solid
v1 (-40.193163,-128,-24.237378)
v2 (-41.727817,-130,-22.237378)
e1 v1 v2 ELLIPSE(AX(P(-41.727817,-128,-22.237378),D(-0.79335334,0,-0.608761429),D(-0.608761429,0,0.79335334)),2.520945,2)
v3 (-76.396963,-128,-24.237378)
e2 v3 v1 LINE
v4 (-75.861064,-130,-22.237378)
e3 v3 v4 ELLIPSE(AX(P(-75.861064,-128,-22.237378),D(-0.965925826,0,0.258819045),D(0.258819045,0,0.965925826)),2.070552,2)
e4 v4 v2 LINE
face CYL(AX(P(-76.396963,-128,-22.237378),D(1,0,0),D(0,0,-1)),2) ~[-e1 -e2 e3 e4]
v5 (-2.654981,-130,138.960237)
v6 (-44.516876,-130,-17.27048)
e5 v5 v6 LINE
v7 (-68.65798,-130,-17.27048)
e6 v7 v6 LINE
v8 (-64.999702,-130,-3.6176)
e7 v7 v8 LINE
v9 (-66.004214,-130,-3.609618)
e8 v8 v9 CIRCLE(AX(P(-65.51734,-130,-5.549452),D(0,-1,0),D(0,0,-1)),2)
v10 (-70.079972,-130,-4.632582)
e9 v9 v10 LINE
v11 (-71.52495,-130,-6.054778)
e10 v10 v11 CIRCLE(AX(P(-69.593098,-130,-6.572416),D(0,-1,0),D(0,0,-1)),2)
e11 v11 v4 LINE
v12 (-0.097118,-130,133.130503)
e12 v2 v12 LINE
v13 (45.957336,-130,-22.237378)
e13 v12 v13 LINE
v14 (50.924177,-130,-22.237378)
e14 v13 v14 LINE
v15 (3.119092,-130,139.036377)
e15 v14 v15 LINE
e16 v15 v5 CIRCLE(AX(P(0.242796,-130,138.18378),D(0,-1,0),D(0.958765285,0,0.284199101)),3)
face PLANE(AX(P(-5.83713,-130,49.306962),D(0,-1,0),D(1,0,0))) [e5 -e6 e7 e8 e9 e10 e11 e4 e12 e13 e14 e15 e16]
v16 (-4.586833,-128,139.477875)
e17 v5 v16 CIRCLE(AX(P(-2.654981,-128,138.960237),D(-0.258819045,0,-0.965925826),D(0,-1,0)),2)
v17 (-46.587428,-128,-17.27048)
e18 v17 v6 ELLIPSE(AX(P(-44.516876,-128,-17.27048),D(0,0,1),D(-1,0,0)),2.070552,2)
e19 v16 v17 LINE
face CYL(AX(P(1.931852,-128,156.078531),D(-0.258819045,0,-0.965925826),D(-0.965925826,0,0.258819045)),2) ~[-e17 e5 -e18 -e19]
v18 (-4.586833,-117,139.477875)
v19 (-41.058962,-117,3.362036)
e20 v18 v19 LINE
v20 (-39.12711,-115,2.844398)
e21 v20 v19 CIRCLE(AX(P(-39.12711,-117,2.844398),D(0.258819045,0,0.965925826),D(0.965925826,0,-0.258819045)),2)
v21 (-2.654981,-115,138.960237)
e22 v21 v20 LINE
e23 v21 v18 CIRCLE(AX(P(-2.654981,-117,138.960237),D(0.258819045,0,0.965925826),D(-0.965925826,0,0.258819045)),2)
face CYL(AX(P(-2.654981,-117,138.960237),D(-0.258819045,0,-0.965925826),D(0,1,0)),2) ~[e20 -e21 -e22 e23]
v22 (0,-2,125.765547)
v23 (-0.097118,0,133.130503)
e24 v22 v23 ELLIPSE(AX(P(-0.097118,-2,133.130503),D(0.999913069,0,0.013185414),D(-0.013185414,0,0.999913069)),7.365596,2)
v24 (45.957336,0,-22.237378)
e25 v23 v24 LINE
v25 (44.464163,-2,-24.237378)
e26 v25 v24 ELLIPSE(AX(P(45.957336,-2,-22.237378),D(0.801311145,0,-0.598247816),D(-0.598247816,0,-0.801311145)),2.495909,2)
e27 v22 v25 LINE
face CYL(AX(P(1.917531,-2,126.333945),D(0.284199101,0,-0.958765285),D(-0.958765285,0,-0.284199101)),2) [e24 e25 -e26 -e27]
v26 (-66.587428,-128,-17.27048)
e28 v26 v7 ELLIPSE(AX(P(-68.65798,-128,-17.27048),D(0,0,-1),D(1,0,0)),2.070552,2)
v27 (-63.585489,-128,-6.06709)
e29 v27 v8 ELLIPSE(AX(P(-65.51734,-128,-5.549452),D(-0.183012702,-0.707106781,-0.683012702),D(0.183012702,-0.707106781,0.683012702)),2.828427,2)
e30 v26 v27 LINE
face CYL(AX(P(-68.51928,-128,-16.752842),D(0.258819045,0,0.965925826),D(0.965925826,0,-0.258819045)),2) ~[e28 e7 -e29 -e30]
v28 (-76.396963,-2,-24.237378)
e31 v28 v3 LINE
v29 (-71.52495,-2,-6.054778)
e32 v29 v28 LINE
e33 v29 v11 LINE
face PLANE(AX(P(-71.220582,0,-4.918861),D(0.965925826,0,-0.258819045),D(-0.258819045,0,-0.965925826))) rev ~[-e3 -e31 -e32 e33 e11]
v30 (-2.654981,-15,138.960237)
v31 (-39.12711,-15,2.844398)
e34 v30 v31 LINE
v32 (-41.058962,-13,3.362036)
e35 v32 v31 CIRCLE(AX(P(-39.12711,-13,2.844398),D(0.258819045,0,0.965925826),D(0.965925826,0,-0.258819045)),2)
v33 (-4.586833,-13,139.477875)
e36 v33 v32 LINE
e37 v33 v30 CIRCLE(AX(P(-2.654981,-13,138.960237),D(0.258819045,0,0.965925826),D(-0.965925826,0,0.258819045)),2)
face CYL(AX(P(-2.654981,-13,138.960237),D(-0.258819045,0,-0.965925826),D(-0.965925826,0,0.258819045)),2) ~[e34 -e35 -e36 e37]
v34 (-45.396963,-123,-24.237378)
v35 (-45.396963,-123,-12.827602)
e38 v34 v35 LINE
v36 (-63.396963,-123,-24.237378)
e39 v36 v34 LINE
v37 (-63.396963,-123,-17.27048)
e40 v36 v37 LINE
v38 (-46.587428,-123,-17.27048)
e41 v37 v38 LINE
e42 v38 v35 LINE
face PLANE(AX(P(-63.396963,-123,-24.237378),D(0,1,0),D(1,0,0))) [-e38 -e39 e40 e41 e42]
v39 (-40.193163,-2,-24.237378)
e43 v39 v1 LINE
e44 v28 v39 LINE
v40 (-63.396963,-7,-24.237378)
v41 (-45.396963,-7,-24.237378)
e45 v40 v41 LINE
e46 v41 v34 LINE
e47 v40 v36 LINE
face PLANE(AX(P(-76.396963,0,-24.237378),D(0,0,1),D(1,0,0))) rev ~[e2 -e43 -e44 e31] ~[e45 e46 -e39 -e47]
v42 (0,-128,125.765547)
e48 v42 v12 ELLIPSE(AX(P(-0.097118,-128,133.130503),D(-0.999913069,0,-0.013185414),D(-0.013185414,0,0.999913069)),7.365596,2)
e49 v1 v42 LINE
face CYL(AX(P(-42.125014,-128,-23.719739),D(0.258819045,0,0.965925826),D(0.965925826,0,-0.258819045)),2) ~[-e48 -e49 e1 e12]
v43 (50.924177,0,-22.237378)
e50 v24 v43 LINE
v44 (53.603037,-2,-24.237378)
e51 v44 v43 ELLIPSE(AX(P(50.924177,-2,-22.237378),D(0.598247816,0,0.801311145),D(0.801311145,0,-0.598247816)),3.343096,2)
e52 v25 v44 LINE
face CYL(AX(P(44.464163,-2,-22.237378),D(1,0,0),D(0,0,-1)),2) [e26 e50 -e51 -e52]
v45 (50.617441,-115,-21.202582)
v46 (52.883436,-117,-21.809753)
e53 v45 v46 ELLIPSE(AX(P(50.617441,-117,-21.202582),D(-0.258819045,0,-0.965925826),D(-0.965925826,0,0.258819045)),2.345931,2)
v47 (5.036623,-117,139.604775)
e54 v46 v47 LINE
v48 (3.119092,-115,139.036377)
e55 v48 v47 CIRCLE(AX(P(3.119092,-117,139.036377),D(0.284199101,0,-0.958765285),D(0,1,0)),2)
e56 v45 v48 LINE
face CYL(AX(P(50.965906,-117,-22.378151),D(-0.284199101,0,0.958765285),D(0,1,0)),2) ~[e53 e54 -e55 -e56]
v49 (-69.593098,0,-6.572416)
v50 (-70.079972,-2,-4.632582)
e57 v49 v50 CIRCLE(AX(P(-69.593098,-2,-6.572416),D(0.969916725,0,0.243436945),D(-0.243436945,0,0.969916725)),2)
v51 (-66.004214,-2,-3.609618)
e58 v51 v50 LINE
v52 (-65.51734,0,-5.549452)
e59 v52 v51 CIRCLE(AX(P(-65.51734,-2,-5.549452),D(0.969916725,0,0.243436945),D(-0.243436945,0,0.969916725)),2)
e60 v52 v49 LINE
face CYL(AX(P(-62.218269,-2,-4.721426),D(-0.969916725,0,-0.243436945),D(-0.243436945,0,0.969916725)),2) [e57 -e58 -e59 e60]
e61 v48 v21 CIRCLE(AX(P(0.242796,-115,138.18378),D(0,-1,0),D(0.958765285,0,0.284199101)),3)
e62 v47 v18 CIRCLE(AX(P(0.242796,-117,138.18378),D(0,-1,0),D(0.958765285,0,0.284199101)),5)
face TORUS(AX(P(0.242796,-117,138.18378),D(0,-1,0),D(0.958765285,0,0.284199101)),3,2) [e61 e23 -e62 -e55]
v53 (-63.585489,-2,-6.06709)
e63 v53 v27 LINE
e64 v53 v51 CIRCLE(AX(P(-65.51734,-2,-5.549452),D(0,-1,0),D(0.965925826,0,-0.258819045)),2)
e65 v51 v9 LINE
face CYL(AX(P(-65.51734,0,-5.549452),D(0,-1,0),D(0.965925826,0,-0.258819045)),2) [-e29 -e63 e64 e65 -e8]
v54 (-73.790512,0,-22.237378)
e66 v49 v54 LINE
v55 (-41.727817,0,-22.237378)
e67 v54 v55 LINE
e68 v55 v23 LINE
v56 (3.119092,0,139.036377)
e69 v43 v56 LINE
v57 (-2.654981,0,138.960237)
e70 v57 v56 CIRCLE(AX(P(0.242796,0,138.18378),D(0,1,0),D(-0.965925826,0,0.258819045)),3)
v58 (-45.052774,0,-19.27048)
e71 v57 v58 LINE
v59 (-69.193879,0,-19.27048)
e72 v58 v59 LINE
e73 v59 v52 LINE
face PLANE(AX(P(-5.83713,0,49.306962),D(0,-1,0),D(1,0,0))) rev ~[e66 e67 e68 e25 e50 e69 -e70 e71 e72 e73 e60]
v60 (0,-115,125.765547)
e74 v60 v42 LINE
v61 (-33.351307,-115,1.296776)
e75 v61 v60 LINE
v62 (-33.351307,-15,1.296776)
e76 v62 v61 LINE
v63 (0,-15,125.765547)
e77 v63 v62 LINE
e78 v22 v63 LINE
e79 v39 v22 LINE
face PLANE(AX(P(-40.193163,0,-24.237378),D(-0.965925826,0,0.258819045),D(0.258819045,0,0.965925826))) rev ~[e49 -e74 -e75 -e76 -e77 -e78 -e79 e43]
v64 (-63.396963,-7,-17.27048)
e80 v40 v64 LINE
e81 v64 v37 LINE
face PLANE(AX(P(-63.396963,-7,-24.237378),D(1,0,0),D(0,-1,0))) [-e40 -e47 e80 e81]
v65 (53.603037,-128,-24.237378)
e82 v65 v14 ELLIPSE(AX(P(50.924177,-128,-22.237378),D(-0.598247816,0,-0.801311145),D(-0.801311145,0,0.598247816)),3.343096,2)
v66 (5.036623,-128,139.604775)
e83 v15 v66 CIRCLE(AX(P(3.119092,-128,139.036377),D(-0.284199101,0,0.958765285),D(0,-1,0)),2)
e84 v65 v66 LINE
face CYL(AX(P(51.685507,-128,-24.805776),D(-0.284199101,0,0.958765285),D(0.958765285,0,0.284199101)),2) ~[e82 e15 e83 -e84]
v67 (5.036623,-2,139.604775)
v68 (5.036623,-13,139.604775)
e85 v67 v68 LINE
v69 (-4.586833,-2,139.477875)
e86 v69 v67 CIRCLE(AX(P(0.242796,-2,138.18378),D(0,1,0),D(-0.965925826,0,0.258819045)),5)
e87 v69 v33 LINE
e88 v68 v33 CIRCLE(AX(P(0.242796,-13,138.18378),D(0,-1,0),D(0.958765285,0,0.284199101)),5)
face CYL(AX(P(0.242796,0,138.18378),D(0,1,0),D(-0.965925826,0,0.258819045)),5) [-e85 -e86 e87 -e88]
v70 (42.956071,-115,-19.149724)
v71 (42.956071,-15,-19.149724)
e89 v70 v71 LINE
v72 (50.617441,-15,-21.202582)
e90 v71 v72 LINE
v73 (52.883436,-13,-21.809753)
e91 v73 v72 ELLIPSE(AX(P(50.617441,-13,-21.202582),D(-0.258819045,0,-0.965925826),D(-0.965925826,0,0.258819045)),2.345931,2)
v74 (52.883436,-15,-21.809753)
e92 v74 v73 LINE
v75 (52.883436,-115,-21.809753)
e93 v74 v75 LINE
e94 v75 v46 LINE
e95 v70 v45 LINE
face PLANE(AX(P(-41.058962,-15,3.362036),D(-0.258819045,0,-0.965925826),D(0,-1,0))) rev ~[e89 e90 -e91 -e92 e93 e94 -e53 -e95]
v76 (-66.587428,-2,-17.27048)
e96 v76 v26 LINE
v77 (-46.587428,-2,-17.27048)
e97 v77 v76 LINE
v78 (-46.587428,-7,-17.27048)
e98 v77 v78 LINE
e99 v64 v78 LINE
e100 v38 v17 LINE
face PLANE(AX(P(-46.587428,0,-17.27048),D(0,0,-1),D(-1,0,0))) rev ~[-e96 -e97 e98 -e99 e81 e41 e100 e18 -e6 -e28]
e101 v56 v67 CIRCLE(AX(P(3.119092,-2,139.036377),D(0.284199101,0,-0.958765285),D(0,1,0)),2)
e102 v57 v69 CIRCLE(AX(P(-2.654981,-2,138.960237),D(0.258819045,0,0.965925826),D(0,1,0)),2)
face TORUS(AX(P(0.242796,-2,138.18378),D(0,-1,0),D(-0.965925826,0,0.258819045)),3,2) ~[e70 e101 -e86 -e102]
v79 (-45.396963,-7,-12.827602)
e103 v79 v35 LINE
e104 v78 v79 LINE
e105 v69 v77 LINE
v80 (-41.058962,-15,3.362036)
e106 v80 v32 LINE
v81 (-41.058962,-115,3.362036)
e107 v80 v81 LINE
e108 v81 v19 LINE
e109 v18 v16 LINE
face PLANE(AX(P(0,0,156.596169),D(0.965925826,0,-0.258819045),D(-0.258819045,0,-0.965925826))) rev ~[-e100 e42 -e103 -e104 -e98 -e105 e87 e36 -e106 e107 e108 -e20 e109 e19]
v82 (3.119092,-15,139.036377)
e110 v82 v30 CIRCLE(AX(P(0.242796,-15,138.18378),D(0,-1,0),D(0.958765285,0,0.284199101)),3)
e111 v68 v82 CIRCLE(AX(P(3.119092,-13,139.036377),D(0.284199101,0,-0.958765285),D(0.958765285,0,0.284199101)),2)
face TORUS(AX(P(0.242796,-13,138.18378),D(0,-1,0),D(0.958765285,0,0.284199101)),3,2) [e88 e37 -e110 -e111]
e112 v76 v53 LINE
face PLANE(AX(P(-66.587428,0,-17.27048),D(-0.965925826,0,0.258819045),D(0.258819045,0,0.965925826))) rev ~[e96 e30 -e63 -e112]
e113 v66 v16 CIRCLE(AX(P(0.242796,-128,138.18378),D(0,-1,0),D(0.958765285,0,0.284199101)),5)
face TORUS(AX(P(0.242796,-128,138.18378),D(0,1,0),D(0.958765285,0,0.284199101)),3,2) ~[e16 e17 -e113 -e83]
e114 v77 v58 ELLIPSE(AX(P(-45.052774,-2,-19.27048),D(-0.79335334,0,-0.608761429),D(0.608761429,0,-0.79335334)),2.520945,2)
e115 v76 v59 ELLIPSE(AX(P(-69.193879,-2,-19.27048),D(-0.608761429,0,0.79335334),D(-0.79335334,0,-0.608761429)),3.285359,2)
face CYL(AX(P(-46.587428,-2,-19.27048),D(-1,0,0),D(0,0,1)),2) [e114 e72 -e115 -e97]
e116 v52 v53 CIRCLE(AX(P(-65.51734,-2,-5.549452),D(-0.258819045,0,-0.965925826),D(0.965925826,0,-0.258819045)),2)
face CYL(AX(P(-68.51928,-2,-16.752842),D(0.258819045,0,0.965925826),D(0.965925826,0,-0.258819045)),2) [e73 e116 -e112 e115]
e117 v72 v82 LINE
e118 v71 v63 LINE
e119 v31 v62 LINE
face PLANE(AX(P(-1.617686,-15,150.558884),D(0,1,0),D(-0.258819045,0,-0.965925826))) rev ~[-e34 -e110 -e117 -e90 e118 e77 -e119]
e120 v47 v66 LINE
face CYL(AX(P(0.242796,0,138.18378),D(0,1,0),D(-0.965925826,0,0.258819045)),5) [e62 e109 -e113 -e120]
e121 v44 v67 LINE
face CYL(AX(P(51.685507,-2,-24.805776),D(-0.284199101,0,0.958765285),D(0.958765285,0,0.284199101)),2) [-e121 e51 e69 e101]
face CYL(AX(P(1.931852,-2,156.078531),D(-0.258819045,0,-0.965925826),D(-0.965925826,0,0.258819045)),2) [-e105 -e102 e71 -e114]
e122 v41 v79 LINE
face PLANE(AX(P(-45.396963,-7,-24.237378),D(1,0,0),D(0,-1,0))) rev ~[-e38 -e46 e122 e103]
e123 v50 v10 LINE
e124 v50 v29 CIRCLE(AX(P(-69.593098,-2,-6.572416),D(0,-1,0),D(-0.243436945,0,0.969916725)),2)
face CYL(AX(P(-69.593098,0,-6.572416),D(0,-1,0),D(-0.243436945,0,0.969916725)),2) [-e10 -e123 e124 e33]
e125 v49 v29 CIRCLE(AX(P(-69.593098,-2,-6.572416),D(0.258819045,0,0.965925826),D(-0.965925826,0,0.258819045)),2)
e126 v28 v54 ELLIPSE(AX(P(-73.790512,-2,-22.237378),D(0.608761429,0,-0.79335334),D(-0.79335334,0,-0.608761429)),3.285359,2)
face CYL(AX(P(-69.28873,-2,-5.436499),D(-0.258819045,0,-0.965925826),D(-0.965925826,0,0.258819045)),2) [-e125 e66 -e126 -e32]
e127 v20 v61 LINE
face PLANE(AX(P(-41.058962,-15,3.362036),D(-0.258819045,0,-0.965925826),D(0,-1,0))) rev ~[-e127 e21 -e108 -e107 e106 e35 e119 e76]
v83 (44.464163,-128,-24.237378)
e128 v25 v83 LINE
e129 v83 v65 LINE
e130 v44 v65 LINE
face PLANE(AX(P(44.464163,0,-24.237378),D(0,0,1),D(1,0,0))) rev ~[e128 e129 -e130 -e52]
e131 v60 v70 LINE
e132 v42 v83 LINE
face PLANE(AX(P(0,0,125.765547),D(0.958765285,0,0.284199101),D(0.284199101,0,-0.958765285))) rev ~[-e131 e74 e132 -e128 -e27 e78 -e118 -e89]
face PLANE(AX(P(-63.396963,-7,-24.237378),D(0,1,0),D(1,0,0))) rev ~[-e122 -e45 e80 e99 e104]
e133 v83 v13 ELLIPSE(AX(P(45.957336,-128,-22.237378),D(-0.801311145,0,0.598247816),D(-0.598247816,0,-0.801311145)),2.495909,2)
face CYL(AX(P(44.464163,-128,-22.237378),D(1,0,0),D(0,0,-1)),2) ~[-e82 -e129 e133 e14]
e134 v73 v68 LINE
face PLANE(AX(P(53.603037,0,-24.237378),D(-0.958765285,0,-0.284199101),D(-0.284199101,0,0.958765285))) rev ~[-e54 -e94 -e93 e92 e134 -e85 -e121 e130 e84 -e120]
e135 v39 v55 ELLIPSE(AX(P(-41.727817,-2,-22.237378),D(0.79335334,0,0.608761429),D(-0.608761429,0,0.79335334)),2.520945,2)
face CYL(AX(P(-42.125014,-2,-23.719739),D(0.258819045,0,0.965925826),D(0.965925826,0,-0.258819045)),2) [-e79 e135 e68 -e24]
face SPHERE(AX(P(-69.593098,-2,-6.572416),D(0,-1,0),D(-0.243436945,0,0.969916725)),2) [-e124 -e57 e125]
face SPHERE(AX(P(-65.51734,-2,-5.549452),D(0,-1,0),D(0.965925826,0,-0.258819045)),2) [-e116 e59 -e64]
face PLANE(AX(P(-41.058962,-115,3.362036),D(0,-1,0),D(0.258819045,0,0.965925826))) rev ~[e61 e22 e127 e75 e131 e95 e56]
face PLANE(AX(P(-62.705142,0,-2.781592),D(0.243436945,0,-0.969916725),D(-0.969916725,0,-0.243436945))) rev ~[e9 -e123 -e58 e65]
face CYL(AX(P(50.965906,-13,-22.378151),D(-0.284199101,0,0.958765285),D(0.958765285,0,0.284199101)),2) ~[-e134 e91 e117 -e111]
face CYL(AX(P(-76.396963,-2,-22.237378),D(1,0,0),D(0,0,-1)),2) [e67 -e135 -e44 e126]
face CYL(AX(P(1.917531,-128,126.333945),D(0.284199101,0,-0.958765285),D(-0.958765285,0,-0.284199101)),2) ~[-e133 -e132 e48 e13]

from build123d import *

# Parameters (mm, degrees)
F1_DEPTH    = 130
F2_R        = 2
F3_T1_DEPTH = 130
F3_T4_ANGLE = 148.4890190499
F3_T6_ANGLE = 148.4890190499
F4_W        = 18
F4_H        = 116
F5_DEPTH    = 15
F6_W        = 100
F6_H        = 140.9174852884
F6_H_2      = 11.4719050156
F1_FACE2_W  = 126
F1_FACE2_H  = 170.8886996293
F7_DEPTH    = 300
F8_R        = 2


# Not quite as in the source:
# - a fillet or chamfer that OpenCascade refuses, or shapes differently, is made with other operations: its cross-section is extruded or revolved along the edge and cut away or added


with BuildPart() as f1:
    # F0 (on Front) → F1 (new body)
    with BuildSketch(Plane.XZ):
        Polygon((-46.5874281185, -17.2704798563), (-66.5874281185, -17.2704798563), (-62.7051424419, -2.781592462), (-71.2205818073, -4.9188610433), (-76.3969627094, -24.2373775691), (-40.1931625425, -24.2373775691), (0, 125.7655471563), (44.4641634577, -24.2373775691), (53.6030372906, -24.2373775691), (0, 156.5961688757), align=None)
    extrude(amount=F1_DEPTH)

    # F2
    f2_edges = [f1.edges().sort_by_distance(p)[0] for p in [
        (-23.293714, -130, 69.662845),
        (-20.096581, -130, 50.764085),
        (-64.646285, -130, -10.026036),
        (-62.705142, -65, -2.781592),
        (-71.220582, -65, -4.918861),
        (22.232082, -130, 50.764085),
        (26.801519, -130, 66.179396),
        (-23.293714, 0, 69.662845),
        (-20.096581, 0, 50.764085),
        (-56.587428, 0, -17.27048),
        (-64.646285, 0, -10.026036),
        (-66.962862, 0, -3.850227),
        (-73.808772, 0, -14.578119),
        (-58.295063, 0, -24.237378),
        (22.232082, 0, 50.764085),
        (49.0336, 0, -24.237378),
        (26.801519, 0, 66.179396),
        (-58.295063, -130, -24.237378),
        (49.0336, -130, -24.237378),
    ]]
    fillet(f2_edges, radius=F2_R)

    # F3: fillet of radius 5 on 1 edges, made by hand

    # F3_s2 → F3_t1 (cut)
    with BuildSketch(Plane.XZ):
        with BuildLine():
            ThreePointArc((-4.5868330474, 139.4778748971), (0.1768690132, 143.1833450148), (5.0366225074, 139.6047751759))
            Line((5.0366225074, 139.6047751759), (0, 156.5961688757))
            Line((0, 156.5961688757), (-4.5868330474, 139.4778748971))
        make_face()
    extrude(amount=F3_T1_DEPTH, mode=Mode.SUBTRACT)

    # F3_s3 → F3_t4 (revolve, cut)
    with BuildSketch(Plane(origin=(34.5622091716, 0, 128.9879206501), x_dir=(0, 1, 0), z_dir=(-0.2588190451, 0, -0.9659258263))):
        with BuildLine():
            ThreePointArc((0, -38.5300708951), (-0.5857864376, -39.9442844575), (-2, -40.5300708951))
            Line((-2, -40.5300708951), (0, -40.5300708951))
            Line((0, -40.5300708951), (0, -38.5300708951))
        make_face()
    revolve(axis=Axis((0.2427960841, 0, 138.1837796716), (0, 1, 0)), revolution_arc=F3_T4_ANGLE, mode=Mode.SUBTRACT)

    # F3_s5 → F3_t6 (revolve, cut)
    with BuildSketch(Plane(origin=(-37.6327378938, 0, 126.9566390213), x_dir=(0, 1, 0), z_dir=(0.2841991009, 0, -0.9587652847))):
        with BuildLine():
            ThreePointArc((-130, 42.5044903939), (-129.4142135624, 43.9187039563), (-128, 44.5044903939))
            Line((-128, 44.5044903939), (-130, 44.5044903939))
            Line((-130, 44.5044903939), (-130, 42.5044903939))
        make_face()
    revolve(axis=Axis((0.2427960841, -130, 138.1837796716), (0, -1, 0)), revolution_arc=F3_T6_ANGLE, mode=Mode.SUBTRACT)

    # F4 (on face) → F5 (cut)
    with BuildSketch(Plane(origin=(0, 0, -24.2373775691), x_dir=(1, 0, 0), z_dir=(0, 0, -1))):
        with Locations((-54.3969627094, 65)):
            Rectangle(F4_W, F4_H)
    extrude(amount=-F5_DEPTH, mode=Mode.SUBTRACT)

    # F6 (on face) + F1_face2 (on face) → F7 (cut)
    with BuildSketch(Plane(origin=(-39.1490422189, 0, 10.489954247), x_dir=(0, -1, 0), z_dir=(-0.9659258263, 0, 0.2588190451))):
        with Locations((65, 63.0793791654)):
            Rectangle(F6_W, F6_H)
        with Locations((65, 139.2740743175)):
            Rectangle(F6_W, F6_H_2)
    with BuildSketch(Plane(origin=(29.319829899, -65, 57.6836988034), x_dir=(0, 1, 0), z_dir=(0.9587652847, 0, 0.2841991009))):
        Rectangle(F1_FACE2_W, F1_FACE2_H)
    extrude(amount=-F7_DEPTH, dir=(-0.9659258263, 0, 0.2588190451), mode=Mode.SUBTRACT)

    # F8
    f8_edges = [f1.edges().sort_by_distance(p)[0] for p in [
        (-22.822898, -15, 71.419956),
        (28.960029, -115, 58.897511),
        (-22.822898, -115, 71.419956),
        (0.176869, -115, 143.183345),
        (28.960029, -15, 58.897511),
        (0.176869, -15, 143.183345),
    ]]
    fillet(f8_edges, radius=F8_R)


solid = f1.part
